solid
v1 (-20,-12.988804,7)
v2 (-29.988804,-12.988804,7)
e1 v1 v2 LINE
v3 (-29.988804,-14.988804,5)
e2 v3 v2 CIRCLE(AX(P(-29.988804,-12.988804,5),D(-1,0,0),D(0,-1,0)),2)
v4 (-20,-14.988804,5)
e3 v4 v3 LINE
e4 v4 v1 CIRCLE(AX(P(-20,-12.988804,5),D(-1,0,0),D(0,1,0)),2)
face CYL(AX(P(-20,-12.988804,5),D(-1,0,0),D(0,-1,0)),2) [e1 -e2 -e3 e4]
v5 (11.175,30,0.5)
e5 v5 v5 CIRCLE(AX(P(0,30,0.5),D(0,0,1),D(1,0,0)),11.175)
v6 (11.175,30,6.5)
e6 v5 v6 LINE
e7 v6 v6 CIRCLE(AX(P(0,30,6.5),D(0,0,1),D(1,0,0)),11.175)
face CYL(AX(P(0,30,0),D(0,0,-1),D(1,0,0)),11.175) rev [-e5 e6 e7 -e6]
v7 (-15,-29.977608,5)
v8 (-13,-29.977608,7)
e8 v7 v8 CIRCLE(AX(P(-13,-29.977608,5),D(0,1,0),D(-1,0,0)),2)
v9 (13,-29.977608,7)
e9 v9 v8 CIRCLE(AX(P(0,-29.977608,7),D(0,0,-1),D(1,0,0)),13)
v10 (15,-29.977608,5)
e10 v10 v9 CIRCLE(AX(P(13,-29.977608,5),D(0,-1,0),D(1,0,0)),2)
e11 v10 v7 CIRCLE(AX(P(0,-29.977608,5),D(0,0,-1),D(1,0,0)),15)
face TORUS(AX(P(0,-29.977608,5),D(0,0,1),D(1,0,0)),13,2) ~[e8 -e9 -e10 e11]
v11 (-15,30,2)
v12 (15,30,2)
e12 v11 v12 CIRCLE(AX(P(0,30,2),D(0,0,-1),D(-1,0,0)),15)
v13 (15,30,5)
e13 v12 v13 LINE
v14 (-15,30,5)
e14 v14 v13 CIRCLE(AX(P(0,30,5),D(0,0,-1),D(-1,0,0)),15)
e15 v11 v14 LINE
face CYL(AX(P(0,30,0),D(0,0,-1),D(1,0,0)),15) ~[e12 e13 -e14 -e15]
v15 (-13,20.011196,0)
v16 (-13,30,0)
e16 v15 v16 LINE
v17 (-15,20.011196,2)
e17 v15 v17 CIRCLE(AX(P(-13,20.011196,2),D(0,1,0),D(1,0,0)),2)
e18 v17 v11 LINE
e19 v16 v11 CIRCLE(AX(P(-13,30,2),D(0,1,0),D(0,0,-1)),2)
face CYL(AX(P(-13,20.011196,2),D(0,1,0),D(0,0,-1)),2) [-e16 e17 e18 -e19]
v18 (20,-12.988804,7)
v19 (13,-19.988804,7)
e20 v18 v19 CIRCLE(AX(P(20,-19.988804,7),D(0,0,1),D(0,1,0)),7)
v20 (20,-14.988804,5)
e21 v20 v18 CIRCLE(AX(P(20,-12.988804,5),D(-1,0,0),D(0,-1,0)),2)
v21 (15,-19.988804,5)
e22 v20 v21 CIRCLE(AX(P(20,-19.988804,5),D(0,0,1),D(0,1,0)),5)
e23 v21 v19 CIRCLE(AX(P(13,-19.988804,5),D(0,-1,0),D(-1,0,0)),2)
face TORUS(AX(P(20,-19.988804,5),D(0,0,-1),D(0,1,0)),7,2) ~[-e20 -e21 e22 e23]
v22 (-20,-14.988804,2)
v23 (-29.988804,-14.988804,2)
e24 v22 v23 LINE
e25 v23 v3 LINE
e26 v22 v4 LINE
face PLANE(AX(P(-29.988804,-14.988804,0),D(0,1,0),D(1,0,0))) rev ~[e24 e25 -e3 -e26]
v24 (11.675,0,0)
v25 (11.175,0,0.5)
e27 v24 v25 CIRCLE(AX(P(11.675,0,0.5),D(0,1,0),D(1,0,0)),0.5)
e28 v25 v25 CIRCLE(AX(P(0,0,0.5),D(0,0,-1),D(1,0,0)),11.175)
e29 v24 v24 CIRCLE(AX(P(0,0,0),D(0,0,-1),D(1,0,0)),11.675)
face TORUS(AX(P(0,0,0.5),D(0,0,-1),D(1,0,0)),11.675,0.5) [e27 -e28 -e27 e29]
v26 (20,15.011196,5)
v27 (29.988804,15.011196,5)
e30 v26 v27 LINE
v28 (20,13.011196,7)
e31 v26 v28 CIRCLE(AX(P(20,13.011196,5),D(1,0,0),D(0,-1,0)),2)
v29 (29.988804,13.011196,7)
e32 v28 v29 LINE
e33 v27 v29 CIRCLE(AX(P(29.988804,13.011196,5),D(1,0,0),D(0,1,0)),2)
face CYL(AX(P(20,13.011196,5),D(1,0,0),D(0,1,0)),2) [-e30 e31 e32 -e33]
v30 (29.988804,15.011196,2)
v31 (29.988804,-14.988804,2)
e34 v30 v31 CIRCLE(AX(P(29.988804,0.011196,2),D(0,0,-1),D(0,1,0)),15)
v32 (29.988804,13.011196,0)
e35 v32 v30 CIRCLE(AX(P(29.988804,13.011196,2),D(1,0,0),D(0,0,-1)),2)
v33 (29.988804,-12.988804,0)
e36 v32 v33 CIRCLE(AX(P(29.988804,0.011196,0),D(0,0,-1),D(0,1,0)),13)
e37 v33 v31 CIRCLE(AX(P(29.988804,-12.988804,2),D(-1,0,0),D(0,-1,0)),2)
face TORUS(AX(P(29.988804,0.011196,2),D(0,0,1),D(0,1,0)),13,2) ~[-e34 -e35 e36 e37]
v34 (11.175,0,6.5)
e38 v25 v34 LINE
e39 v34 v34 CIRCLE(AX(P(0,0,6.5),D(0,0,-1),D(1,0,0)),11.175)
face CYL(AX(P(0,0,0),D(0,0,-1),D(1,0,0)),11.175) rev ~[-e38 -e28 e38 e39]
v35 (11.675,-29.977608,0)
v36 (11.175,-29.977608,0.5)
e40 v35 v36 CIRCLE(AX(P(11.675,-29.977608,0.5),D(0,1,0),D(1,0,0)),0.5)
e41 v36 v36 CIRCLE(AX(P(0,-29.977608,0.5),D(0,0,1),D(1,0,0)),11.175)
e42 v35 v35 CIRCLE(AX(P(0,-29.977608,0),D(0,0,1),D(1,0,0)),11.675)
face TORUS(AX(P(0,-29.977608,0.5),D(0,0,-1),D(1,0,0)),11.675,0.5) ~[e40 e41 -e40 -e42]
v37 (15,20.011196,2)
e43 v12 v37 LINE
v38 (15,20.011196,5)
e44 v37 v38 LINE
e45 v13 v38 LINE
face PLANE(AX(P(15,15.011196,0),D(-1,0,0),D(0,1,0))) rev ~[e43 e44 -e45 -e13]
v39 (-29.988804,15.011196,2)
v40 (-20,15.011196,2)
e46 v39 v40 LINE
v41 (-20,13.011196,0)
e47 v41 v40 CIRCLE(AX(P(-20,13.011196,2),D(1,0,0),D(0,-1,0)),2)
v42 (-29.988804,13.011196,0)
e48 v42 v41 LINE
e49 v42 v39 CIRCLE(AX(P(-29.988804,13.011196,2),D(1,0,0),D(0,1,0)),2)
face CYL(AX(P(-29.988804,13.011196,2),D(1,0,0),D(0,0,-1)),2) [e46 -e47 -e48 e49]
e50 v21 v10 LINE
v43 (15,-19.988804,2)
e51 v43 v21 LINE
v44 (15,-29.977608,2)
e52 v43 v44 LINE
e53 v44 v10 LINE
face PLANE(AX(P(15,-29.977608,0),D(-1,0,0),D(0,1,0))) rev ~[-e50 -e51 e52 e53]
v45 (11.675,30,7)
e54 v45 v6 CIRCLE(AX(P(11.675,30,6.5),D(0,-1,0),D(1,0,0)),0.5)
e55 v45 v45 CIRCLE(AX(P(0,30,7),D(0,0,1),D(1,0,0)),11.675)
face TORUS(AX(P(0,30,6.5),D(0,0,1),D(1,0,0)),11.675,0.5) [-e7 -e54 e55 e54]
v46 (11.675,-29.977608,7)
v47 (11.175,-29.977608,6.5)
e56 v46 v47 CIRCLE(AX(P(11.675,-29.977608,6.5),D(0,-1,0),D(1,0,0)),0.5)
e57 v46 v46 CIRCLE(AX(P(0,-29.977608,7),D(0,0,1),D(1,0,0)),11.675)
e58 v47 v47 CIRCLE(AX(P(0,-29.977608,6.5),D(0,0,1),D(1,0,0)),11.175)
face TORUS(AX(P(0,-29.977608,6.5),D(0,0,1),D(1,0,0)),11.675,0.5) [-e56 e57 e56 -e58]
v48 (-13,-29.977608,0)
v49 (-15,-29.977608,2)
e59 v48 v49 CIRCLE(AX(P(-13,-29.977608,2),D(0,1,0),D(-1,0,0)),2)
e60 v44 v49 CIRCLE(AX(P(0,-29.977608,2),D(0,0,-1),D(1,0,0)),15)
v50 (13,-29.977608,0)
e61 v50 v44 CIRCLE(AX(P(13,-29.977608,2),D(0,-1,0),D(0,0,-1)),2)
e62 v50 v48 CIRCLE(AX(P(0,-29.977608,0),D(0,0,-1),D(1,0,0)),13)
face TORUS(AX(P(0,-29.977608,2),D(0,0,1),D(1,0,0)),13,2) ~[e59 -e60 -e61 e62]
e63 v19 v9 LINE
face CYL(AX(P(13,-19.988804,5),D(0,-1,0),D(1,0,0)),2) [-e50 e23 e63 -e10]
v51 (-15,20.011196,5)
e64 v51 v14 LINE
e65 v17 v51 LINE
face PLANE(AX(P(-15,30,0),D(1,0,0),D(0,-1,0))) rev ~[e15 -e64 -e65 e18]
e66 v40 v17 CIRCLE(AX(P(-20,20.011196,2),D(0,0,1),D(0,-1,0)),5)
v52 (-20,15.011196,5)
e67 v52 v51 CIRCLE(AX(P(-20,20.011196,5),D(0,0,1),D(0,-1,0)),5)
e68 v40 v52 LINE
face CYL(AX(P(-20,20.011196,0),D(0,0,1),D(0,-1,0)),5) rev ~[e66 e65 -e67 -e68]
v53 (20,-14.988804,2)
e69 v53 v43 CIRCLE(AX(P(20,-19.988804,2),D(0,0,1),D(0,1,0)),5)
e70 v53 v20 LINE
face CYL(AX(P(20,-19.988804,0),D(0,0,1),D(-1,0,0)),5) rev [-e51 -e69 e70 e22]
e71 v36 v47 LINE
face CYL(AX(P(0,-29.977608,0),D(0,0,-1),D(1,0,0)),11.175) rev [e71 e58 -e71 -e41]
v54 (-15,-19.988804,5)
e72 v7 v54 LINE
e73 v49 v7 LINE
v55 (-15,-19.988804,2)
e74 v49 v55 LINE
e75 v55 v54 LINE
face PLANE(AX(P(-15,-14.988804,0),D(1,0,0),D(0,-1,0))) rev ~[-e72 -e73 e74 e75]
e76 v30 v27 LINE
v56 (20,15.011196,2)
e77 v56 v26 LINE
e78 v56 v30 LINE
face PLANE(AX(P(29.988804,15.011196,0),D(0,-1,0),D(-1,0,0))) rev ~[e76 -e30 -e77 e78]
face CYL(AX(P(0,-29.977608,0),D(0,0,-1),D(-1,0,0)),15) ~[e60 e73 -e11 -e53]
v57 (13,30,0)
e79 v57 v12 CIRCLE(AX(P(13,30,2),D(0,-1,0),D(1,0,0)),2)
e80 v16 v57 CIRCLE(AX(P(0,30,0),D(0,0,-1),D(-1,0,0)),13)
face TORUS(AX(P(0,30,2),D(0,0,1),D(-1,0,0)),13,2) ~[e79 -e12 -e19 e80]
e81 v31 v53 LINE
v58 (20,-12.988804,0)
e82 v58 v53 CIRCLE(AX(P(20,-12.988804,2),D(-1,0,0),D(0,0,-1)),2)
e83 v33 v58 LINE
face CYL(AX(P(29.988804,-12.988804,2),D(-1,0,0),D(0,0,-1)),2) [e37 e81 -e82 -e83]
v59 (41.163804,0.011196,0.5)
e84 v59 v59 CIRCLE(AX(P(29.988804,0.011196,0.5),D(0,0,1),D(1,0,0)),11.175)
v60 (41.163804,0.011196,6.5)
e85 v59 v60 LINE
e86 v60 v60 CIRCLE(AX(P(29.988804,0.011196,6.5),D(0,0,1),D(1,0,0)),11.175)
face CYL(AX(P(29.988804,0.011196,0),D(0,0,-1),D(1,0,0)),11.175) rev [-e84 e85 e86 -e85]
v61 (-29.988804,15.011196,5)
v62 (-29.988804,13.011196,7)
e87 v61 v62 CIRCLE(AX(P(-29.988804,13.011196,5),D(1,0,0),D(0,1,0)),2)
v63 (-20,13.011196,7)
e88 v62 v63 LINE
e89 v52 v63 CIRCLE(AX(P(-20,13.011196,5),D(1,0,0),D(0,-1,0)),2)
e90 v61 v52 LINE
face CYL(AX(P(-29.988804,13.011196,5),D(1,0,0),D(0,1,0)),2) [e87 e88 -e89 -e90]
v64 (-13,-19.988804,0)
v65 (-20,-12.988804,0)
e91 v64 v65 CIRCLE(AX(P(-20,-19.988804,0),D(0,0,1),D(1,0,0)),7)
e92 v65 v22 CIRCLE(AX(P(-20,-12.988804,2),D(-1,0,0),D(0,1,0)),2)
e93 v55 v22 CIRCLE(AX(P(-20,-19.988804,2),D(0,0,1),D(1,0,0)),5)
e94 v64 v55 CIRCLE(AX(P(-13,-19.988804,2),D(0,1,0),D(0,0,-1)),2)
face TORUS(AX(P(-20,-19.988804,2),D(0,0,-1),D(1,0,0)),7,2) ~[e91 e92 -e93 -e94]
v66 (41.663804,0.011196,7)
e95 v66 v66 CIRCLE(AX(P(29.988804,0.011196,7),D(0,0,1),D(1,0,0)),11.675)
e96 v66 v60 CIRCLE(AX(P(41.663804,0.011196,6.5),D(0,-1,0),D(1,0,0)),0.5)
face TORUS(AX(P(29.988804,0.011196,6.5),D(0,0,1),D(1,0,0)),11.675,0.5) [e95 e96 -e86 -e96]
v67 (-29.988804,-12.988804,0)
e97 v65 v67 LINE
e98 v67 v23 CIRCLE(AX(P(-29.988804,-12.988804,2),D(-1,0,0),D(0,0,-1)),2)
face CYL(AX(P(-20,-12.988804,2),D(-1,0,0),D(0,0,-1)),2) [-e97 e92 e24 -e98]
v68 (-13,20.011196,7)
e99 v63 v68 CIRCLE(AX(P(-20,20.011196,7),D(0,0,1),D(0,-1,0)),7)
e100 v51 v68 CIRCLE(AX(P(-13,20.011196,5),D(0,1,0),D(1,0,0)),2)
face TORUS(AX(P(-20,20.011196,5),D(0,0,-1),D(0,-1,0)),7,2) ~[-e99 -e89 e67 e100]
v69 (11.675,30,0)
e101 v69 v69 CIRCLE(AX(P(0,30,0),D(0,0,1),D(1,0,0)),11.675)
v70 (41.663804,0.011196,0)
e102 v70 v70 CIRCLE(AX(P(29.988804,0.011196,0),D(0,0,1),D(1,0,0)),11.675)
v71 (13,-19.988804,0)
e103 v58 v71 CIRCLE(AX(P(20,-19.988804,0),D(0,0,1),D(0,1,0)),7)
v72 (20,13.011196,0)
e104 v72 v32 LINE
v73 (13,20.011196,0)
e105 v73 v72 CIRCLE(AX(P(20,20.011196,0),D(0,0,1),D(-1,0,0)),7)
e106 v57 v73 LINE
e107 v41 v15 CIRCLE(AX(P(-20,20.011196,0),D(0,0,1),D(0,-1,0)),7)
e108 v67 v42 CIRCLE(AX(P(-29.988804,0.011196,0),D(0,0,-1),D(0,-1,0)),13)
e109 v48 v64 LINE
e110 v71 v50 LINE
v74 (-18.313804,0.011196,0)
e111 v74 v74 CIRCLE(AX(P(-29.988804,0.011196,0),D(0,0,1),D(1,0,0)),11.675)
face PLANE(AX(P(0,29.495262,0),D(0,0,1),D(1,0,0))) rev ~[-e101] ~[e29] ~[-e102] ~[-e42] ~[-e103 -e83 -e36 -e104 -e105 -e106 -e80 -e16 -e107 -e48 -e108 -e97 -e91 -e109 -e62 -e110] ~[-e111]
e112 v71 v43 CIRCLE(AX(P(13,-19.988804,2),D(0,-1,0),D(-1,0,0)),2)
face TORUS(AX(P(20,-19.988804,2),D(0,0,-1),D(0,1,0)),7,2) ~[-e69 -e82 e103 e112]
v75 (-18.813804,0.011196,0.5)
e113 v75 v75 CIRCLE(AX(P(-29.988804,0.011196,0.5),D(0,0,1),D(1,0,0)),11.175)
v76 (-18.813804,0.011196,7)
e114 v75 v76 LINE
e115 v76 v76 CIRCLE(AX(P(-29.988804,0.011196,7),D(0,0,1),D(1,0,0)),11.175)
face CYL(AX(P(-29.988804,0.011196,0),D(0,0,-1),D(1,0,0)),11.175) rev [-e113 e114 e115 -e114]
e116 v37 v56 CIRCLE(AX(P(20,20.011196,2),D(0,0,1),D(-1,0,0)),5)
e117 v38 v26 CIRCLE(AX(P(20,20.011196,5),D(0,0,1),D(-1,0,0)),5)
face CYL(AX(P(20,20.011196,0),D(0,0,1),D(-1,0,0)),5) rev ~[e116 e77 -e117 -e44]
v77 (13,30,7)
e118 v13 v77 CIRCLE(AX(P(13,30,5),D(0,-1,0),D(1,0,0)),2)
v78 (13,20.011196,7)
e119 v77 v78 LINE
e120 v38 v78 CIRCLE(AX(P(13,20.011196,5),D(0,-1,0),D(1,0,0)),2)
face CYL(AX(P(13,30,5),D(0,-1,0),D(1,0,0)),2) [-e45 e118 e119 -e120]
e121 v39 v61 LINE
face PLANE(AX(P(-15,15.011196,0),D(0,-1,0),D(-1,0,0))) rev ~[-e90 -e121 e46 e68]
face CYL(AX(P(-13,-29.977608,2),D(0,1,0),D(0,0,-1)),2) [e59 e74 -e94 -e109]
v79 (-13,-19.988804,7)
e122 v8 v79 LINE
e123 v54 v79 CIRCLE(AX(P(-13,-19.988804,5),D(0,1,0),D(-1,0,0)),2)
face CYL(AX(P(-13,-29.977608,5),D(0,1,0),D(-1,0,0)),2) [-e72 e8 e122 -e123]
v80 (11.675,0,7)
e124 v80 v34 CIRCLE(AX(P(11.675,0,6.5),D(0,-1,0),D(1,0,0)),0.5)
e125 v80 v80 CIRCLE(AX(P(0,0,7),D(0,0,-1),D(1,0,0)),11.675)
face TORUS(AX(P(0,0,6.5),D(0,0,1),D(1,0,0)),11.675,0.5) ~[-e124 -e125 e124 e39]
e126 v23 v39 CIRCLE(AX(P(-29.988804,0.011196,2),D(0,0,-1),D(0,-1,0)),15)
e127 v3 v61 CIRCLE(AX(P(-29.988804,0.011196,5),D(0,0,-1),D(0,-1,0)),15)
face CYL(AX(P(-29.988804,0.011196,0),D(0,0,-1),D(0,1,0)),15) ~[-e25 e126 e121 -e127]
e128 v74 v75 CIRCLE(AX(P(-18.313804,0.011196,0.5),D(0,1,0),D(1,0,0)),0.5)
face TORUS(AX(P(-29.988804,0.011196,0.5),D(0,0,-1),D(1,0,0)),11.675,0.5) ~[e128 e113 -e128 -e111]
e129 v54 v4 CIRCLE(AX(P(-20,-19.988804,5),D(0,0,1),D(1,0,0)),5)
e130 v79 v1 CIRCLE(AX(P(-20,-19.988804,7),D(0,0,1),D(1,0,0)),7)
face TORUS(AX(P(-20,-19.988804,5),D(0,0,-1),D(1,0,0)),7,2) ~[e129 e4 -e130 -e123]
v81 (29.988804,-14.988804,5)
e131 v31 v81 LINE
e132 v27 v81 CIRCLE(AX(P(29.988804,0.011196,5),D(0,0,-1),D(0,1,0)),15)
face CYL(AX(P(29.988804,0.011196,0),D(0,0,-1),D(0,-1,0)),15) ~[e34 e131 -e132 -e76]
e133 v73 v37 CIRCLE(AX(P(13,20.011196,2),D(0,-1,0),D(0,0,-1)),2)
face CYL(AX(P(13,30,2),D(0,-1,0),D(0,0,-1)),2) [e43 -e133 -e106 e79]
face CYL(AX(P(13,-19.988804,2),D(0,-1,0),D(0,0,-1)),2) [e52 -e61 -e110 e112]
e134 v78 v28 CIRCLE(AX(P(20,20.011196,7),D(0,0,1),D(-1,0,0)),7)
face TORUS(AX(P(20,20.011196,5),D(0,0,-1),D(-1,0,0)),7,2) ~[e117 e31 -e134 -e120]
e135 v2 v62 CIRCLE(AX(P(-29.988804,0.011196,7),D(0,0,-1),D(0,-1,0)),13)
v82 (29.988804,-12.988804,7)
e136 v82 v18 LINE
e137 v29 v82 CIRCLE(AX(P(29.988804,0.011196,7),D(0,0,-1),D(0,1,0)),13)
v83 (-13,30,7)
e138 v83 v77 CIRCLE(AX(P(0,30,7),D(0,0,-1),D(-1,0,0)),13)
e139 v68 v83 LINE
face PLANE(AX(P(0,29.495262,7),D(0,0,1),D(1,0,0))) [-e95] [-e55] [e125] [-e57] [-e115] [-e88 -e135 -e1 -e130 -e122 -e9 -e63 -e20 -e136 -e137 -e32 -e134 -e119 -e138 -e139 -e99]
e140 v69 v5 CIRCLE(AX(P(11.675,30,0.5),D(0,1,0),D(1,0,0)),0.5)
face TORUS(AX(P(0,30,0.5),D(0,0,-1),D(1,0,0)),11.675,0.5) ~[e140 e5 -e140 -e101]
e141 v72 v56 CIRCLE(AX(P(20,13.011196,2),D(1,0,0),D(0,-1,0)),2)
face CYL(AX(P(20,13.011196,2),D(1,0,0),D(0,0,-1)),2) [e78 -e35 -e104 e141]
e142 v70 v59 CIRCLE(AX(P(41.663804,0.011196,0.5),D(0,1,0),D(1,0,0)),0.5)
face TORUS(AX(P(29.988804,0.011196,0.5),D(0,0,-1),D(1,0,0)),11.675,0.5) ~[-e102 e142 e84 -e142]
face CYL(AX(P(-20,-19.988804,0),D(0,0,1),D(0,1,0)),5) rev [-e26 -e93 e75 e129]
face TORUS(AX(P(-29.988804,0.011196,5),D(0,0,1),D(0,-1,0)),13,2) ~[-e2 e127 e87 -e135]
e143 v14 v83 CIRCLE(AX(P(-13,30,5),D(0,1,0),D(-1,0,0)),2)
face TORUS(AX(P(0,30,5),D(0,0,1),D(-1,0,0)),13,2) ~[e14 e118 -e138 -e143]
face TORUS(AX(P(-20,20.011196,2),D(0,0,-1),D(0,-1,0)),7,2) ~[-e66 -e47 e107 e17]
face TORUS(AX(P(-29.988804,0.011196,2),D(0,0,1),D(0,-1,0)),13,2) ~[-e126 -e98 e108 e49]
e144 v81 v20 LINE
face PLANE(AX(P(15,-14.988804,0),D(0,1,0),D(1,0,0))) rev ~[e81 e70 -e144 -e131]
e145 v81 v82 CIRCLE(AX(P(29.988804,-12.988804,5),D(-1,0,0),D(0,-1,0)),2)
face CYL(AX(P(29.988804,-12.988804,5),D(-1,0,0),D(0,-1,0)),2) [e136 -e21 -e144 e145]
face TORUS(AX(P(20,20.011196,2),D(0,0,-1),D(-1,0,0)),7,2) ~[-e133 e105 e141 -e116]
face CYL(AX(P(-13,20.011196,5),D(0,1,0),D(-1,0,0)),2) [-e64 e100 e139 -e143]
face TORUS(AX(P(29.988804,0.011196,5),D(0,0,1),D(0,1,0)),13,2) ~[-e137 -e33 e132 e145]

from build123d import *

# Parameters (mm, degrees)
F0_R     = 11.175
F1_DEPTH = 7
F2_R     = 5
F3_R     = 0.5
F4_R     = 2


# Not quite as in the source:
# - a feature names something its author has since deleted; it is built from what else it names


with BuildPart() as f1:
    # F0 (on Top) → F1 (new body)
    with BuildSketch(Plane.XY):
        with BuildLine():
            ThreePointArc((0.5794421554, 15.011195952), (10.8095243265, 19.6002796271), (15, 30))
            ThreePointArc((15, 30), (0, 45), (-15, 30))
            ThreePointArc((-15, 30), (-10.8095243265, 19.6002796271), (-0.5794421554, 15.011195952))
            Line((-0.5794421554, 15.011195952), (-0.011195952, 15.011195952))
            Line((-0.011195952, 15.011195952), (0.011195952, 15.011195952))
            Line((0.011195952, 15.011195952), (0.5794421554, 15.011195952))
        make_face()
        with Locations((0, 30)):
            Circle(F0_R, mode=Mode.SUBTRACT)
        with BuildLine():
            Line((15, 15.011195952), (15, 30))
            ThreePointArc((15, 30), (10.8095243265, 19.6002796271), (0.5794421554, 15.011195952))
            Line((0.5794421554, 15.011195952), (15, 15.011195952))
        make_face()
        with BuildLine():
            ThreePointArc((-0.5794421554, 15.011195952), (-10.8095243265, 19.6002796271), (-15, 30))
            Line((-15, 30), (-15, 15.011195952))
            Line((-15, 15.011195952), (-0.5794421554, 15.011195952))
        make_face()
        with BuildLine():
            Line((15, 15.011195952), (0.5794421554, 15.011195952))
            ThreePointArc((0.5794421554, 15.011195952), (0, 15), (-0.5794421554, 15.011195952))
            Line((-0.5794421554, 15.011195952), (-15, 15.011195952))
            Line((-15, 15.011195952), (-15, 0.5906381074))
            ThreePointArc((-15, 0.5906381074), (-14.9916032972, 0.3009711066), (-14.988804048, 0.011195952))
            ThreePointArc((-14.988804048, 0.011195952), (-14.9888050926, 0.0055979756), (-14.9888082263, 0))
            Line((-14.9888082263, 0), (-11.175, 0))
            ThreePointArc((-11.175, 0), (0, 11.175), (11.175, 0))
            Line((11.175, 0), (14.9888082263, 0))
            ThreePointArc((14.9888082263, 0), (14.9914961979, 0.2953741547), (15, 0.5906381074))
            Line((15, 0.5906381074), (15, 15.011195952))
        make_face()
        with BuildLine():
            ThreePointArc((-0.5794421554, 15.011195952), (0, 15), (0.5794421554, 15.011195952))
            Line((0.5794421554, 15.011195952), (0.011195952, 15.011195952))
            Line((0.011195952, 15.011195952), (-0.011195952, 15.011195952))
            Line((-0.011195952, 15.011195952), (-0.5794421554, 15.011195952))
        make_face()
        with BuildLine():
            Line((29.988804048, 15.011195952), (15, 15.011195952))
            Line((15, 15.011195952), (15, 0.5906381074))
            ThreePointArc((15, 0.5906381074), (19.5890836751, 10.8207202785), (29.988804048, 15.011195952))
        make_face()
        with BuildLine():
            Line((-15, 0.5906381074), (-15, 15.011195952))
            Line((-15, 15.011195952), (-29.988804048, 15.011195952))
            ThreePointArc((-29.988804048, 15.011195952), (-19.5890836751, 10.8207202785), (-15, 0.5906381074))
        make_face()
        with BuildLine():
            ThreePointArc((29.988804048, 15.011195952), (19.5890836751, 10.8207202785), (15, 0.5906381074))
            Line((15, 0.5906381074), (15, 0.0223919041))
            Line((15, 0.0223919041), (15, 0))
            Line((15, 0), (15, -0.5682462034))
            ThreePointArc((15, -0.5682462034), (19.5890836751, -10.7983283745), (29.988804048, -14.988804048))
            ThreePointArc((29.988804048, -14.988804048), (40.5954057658, -10.5954057658), (44.988804048, 0.011195952))
            ThreePointArc((44.988804048, 0.011195952), (40.5954057658, 10.6177976698), (29.988804048, 15.011195952))
        make_face()
        with Locations((29.988804048, 0.011195952)):
            Circle(F0_R, mode=Mode.SUBTRACT)
        with BuildLine():
            Line((15, 0.0223919041), (15, 0.5906381074))
            ThreePointArc((15, 0.5906381074), (14.9914961979, 0.2953741547), (14.9888082263, 0))
            Line((14.9888082263, 0), (15, 0))
            Line((15, 0), (15, 0.0223919041))
        make_face()
        with BuildLine():
            ThreePointArc((-14.988804048, 0.011195952), (-14.9916032972, 0.3009711066), (-15, 0.5906381074))
            Line((-15, 0.5906381074), (-15, 0.0223919041))
            Line((-15, 0.0223919041), (-15, 0))
            Line((-15, 0), (-14.9888082263, 0))
            ThreePointArc((-14.9888082263, 0), (-14.9888050926, 0.0055979756), (-14.988804048, 0.011195952))
        make_face()
        with BuildLine():
            Line((-15, 0.0223919041), (-15, 0.5906381074))
            ThreePointArc((-15, 0.5906381074), (-19.5890836751, 10.8207202785), (-29.988804048, 15.011195952))
            ThreePointArc((-29.988804048, 15.011195952), (-44.988804048, 0.011195952), (-29.988804048, -14.988804048))
            ThreePointArc((-29.988804048, -14.988804048), (-19.5890836751, -10.7983283745), (-15, -0.5682462034))
            Line((-15, -0.5682462034), (-15, 0))
            Line((-15, 0), (-15, 0.0223919041))
        make_face()
        with Locations((-29.988804048, 0.011195952)):
            Circle(F0_R, mode=Mode.SUBTRACT)
        with BuildLine():
            ThreePointArc((15, -0.5682462034), (14.9917124852, -0.2841761141), (14.9888082263, 0))
            Line((14.9888082263, 0), (11.175, 0))
            ThreePointArc((11.175, 0), (0, -11.175), (-11.175, 0))
            Line((-11.175, 0), (-14.9888082263, 0))
            ThreePointArc((-14.9888082263, 0), (-14.9917124852, -0.2841761141), (-15, -0.5682462034))
            Line((-15, -0.5682462034), (-15, -14.988804048))
            Line((-15, -14.988804048), (-0.5794421554, -14.988804048))
            ThreePointArc((-0.5794421554, -14.988804048), (0, -14.9776080959), (0.5794421554, -14.988804048))
            Line((0.5794421554, -14.988804048), (15, -14.988804048))
            Line((15, -14.988804048), (15, -0.5682462034))
        make_face()
        with BuildLine():
            Line((15, 0), (14.9888082263, 0))
            ThreePointArc((14.9888082263, 0), (14.9917124852, -0.2841761141), (15, -0.5682462034))
            Line((15, -0.5682462034), (15, 0))
        make_face()
        with BuildLine():
            ThreePointArc((-15, -0.5682462034), (-19.5890836751, -10.7983283745), (-29.988804048, -14.988804048))
            Line((-29.988804048, -14.988804048), (-15, -14.988804048))
            Line((-15, -14.988804048), (-15, -0.5682462034))
        make_face()
        with BuildLine():
            ThreePointArc((29.988804048, -14.988804048), (19.5890836751, -10.7983283745), (15, -0.5682462034))
            Line((15, -0.5682462034), (15, -14.988804048))
            Line((15, -14.988804048), (29.988804048, -14.988804048))
        make_face()
        with BuildLine():
            Line((-14.9888082263, 0), (-15, 0))
            Line((-15, 0), (-15, -0.5682462034))
            ThreePointArc((-15, -0.5682462034), (-14.9917124852, -0.2841761141), (-14.9888082263, 0))
        make_face()
        with BuildLine():
            Line((-0.5794421554, -14.988804048), (-15, -14.988804048))
            Line((-15, -14.988804048), (-15, -29.9776080959))
            ThreePointArc((-15, -29.9776080959), (-10.8095243265, -19.577887723), (-0.5794421554, -14.988804048))
        make_face()
        with BuildLine():
            Line((15, -29.9776080959), (15, -14.988804048))
            Line((15, -14.988804048), (0.5794421554, -14.988804048))
            ThreePointArc((0.5794421554, -14.988804048), (10.8095243265, -19.577887723), (15, -29.9776080959))
        make_face()
        with BuildLine():
            ThreePointArc((0.5794421554, -14.988804048), (0, -14.9776080959), (-0.5794421554, -14.988804048))
            Line((-0.5794421554, -14.988804048), (-0.011195952, -14.988804048))
            Line((-0.011195952, -14.988804048), (0.011195952, -14.988804048))
            Line((0.011195952, -14.988804048), (0.5794421554, -14.988804048))
        make_face()
        with BuildLine():
            Line((-0.011195952, -14.988804048), (-0.5794421554, -14.988804048))
            ThreePointArc((-0.5794421554, -14.988804048), (-10.8095243265, -19.577887723), (-15, -29.9776080959))
            ThreePointArc((-15, -29.9776080959), (0, -44.9776080959), (15, -29.9776080959))
            ThreePointArc((15, -29.9776080959), (10.8095243265, -19.577887723), (0.5794421554, -14.988804048))
            Line((0.5794421554, -14.988804048), (0.011195952, -14.988804048))
            Line((0.011195952, -14.988804048), (-0.011195952, -14.988804048))
        make_face()
        with Locations((0, -29.9776080959)):
            Circle(F0_R, mode=Mode.SUBTRACT)
    extrude(amount=F1_DEPTH)

    # F2
    f2_edges = [f1.edges().sort_by_distance(p)[0] for p in [
        (-15, 30, 3.5),
        (-15, 15.011196, 3.5),
        (15, 30, 3.5),
        (15, 15.011196, 3.5),
        (15, -14.988804, 3.5),
        (-15, -14.988804, 3.5),
    ]]
    fillet(f2_edges, radius=F2_R)

    # F3
    f3_edges = [f1.edges().sort_by_distance(p)[0] for p in [
        (-11.175, 30, 7),
        (-11.175, 0, 7),
        (-11.175, 30, 0),
        (-11.175, 0, 0),
        (-11.175, -29.977608, 7),
        (-41.163804, 0.011196, 0),
        (18.813804, 0.011196, 0),
        (-11.175, -29.977608, 0),
        (18.813804, 0.011196, 7),
    ]]
    fillet(f3_edges, radius=F3_R)

    # F4
    f4_edges = [f1.edges().sort_by_distance(p)[0] for p in [
        (-16.464466, 16.475662, 0),
        (-15, 20.011196, 3.5),
        (-20, 15.011196, 3.5),
        (-16.464466, 16.475662, 7),
        (-15, 25.005598, 0),
        (-15, 30, 3.5),
        (-15, 25.005598, 7),
        (15, 30, 3.5),
        (0, 45, 0),
        (0, 45, 7),
        (15, 25.005598, 0),
        (15, 20.011196, 3.5),
        (15, 25.005598, 7),
        (16.464466, 16.475662, 0),
        (20, 15.011196, 3.5),
        (16.464466, 16.475662, 7),
        (0, -44.977608, 7),
        (0, -44.977608, 0),
        (-24.994402, -14.988804, 0),
        (-16.464466, -16.45327, 0),
        (-44.988804, 0.011196, 0),
        (-15, -24.983206, 0),
        (-24.994402, 15.011196, 0),
        (15, -24.983206, 0),
        (16.464466, -16.45327, 0),
        (24.994402, -14.988804, 0),
        (44.988804, 0.011196, 0),
        (24.994402, 15.011196, 0),
        (-24.994402, -14.988804, 7),
        (-16.464466, -16.45327, 7),
        (-44.988804, 0.011196, 7),
        (-15, -24.983206, 7),
        (-24.994402, 15.011196, 7),
        (15, -24.983206, 7),
        (16.464466, -16.45327, 7),
        (24.994402, -14.988804, 7),
        (44.988804, 0.011196, 7),
        (24.994402, 15.011196, 7),
    ]]
    fillet(f4_edges, radius=F4_R)


solid = f1.part
